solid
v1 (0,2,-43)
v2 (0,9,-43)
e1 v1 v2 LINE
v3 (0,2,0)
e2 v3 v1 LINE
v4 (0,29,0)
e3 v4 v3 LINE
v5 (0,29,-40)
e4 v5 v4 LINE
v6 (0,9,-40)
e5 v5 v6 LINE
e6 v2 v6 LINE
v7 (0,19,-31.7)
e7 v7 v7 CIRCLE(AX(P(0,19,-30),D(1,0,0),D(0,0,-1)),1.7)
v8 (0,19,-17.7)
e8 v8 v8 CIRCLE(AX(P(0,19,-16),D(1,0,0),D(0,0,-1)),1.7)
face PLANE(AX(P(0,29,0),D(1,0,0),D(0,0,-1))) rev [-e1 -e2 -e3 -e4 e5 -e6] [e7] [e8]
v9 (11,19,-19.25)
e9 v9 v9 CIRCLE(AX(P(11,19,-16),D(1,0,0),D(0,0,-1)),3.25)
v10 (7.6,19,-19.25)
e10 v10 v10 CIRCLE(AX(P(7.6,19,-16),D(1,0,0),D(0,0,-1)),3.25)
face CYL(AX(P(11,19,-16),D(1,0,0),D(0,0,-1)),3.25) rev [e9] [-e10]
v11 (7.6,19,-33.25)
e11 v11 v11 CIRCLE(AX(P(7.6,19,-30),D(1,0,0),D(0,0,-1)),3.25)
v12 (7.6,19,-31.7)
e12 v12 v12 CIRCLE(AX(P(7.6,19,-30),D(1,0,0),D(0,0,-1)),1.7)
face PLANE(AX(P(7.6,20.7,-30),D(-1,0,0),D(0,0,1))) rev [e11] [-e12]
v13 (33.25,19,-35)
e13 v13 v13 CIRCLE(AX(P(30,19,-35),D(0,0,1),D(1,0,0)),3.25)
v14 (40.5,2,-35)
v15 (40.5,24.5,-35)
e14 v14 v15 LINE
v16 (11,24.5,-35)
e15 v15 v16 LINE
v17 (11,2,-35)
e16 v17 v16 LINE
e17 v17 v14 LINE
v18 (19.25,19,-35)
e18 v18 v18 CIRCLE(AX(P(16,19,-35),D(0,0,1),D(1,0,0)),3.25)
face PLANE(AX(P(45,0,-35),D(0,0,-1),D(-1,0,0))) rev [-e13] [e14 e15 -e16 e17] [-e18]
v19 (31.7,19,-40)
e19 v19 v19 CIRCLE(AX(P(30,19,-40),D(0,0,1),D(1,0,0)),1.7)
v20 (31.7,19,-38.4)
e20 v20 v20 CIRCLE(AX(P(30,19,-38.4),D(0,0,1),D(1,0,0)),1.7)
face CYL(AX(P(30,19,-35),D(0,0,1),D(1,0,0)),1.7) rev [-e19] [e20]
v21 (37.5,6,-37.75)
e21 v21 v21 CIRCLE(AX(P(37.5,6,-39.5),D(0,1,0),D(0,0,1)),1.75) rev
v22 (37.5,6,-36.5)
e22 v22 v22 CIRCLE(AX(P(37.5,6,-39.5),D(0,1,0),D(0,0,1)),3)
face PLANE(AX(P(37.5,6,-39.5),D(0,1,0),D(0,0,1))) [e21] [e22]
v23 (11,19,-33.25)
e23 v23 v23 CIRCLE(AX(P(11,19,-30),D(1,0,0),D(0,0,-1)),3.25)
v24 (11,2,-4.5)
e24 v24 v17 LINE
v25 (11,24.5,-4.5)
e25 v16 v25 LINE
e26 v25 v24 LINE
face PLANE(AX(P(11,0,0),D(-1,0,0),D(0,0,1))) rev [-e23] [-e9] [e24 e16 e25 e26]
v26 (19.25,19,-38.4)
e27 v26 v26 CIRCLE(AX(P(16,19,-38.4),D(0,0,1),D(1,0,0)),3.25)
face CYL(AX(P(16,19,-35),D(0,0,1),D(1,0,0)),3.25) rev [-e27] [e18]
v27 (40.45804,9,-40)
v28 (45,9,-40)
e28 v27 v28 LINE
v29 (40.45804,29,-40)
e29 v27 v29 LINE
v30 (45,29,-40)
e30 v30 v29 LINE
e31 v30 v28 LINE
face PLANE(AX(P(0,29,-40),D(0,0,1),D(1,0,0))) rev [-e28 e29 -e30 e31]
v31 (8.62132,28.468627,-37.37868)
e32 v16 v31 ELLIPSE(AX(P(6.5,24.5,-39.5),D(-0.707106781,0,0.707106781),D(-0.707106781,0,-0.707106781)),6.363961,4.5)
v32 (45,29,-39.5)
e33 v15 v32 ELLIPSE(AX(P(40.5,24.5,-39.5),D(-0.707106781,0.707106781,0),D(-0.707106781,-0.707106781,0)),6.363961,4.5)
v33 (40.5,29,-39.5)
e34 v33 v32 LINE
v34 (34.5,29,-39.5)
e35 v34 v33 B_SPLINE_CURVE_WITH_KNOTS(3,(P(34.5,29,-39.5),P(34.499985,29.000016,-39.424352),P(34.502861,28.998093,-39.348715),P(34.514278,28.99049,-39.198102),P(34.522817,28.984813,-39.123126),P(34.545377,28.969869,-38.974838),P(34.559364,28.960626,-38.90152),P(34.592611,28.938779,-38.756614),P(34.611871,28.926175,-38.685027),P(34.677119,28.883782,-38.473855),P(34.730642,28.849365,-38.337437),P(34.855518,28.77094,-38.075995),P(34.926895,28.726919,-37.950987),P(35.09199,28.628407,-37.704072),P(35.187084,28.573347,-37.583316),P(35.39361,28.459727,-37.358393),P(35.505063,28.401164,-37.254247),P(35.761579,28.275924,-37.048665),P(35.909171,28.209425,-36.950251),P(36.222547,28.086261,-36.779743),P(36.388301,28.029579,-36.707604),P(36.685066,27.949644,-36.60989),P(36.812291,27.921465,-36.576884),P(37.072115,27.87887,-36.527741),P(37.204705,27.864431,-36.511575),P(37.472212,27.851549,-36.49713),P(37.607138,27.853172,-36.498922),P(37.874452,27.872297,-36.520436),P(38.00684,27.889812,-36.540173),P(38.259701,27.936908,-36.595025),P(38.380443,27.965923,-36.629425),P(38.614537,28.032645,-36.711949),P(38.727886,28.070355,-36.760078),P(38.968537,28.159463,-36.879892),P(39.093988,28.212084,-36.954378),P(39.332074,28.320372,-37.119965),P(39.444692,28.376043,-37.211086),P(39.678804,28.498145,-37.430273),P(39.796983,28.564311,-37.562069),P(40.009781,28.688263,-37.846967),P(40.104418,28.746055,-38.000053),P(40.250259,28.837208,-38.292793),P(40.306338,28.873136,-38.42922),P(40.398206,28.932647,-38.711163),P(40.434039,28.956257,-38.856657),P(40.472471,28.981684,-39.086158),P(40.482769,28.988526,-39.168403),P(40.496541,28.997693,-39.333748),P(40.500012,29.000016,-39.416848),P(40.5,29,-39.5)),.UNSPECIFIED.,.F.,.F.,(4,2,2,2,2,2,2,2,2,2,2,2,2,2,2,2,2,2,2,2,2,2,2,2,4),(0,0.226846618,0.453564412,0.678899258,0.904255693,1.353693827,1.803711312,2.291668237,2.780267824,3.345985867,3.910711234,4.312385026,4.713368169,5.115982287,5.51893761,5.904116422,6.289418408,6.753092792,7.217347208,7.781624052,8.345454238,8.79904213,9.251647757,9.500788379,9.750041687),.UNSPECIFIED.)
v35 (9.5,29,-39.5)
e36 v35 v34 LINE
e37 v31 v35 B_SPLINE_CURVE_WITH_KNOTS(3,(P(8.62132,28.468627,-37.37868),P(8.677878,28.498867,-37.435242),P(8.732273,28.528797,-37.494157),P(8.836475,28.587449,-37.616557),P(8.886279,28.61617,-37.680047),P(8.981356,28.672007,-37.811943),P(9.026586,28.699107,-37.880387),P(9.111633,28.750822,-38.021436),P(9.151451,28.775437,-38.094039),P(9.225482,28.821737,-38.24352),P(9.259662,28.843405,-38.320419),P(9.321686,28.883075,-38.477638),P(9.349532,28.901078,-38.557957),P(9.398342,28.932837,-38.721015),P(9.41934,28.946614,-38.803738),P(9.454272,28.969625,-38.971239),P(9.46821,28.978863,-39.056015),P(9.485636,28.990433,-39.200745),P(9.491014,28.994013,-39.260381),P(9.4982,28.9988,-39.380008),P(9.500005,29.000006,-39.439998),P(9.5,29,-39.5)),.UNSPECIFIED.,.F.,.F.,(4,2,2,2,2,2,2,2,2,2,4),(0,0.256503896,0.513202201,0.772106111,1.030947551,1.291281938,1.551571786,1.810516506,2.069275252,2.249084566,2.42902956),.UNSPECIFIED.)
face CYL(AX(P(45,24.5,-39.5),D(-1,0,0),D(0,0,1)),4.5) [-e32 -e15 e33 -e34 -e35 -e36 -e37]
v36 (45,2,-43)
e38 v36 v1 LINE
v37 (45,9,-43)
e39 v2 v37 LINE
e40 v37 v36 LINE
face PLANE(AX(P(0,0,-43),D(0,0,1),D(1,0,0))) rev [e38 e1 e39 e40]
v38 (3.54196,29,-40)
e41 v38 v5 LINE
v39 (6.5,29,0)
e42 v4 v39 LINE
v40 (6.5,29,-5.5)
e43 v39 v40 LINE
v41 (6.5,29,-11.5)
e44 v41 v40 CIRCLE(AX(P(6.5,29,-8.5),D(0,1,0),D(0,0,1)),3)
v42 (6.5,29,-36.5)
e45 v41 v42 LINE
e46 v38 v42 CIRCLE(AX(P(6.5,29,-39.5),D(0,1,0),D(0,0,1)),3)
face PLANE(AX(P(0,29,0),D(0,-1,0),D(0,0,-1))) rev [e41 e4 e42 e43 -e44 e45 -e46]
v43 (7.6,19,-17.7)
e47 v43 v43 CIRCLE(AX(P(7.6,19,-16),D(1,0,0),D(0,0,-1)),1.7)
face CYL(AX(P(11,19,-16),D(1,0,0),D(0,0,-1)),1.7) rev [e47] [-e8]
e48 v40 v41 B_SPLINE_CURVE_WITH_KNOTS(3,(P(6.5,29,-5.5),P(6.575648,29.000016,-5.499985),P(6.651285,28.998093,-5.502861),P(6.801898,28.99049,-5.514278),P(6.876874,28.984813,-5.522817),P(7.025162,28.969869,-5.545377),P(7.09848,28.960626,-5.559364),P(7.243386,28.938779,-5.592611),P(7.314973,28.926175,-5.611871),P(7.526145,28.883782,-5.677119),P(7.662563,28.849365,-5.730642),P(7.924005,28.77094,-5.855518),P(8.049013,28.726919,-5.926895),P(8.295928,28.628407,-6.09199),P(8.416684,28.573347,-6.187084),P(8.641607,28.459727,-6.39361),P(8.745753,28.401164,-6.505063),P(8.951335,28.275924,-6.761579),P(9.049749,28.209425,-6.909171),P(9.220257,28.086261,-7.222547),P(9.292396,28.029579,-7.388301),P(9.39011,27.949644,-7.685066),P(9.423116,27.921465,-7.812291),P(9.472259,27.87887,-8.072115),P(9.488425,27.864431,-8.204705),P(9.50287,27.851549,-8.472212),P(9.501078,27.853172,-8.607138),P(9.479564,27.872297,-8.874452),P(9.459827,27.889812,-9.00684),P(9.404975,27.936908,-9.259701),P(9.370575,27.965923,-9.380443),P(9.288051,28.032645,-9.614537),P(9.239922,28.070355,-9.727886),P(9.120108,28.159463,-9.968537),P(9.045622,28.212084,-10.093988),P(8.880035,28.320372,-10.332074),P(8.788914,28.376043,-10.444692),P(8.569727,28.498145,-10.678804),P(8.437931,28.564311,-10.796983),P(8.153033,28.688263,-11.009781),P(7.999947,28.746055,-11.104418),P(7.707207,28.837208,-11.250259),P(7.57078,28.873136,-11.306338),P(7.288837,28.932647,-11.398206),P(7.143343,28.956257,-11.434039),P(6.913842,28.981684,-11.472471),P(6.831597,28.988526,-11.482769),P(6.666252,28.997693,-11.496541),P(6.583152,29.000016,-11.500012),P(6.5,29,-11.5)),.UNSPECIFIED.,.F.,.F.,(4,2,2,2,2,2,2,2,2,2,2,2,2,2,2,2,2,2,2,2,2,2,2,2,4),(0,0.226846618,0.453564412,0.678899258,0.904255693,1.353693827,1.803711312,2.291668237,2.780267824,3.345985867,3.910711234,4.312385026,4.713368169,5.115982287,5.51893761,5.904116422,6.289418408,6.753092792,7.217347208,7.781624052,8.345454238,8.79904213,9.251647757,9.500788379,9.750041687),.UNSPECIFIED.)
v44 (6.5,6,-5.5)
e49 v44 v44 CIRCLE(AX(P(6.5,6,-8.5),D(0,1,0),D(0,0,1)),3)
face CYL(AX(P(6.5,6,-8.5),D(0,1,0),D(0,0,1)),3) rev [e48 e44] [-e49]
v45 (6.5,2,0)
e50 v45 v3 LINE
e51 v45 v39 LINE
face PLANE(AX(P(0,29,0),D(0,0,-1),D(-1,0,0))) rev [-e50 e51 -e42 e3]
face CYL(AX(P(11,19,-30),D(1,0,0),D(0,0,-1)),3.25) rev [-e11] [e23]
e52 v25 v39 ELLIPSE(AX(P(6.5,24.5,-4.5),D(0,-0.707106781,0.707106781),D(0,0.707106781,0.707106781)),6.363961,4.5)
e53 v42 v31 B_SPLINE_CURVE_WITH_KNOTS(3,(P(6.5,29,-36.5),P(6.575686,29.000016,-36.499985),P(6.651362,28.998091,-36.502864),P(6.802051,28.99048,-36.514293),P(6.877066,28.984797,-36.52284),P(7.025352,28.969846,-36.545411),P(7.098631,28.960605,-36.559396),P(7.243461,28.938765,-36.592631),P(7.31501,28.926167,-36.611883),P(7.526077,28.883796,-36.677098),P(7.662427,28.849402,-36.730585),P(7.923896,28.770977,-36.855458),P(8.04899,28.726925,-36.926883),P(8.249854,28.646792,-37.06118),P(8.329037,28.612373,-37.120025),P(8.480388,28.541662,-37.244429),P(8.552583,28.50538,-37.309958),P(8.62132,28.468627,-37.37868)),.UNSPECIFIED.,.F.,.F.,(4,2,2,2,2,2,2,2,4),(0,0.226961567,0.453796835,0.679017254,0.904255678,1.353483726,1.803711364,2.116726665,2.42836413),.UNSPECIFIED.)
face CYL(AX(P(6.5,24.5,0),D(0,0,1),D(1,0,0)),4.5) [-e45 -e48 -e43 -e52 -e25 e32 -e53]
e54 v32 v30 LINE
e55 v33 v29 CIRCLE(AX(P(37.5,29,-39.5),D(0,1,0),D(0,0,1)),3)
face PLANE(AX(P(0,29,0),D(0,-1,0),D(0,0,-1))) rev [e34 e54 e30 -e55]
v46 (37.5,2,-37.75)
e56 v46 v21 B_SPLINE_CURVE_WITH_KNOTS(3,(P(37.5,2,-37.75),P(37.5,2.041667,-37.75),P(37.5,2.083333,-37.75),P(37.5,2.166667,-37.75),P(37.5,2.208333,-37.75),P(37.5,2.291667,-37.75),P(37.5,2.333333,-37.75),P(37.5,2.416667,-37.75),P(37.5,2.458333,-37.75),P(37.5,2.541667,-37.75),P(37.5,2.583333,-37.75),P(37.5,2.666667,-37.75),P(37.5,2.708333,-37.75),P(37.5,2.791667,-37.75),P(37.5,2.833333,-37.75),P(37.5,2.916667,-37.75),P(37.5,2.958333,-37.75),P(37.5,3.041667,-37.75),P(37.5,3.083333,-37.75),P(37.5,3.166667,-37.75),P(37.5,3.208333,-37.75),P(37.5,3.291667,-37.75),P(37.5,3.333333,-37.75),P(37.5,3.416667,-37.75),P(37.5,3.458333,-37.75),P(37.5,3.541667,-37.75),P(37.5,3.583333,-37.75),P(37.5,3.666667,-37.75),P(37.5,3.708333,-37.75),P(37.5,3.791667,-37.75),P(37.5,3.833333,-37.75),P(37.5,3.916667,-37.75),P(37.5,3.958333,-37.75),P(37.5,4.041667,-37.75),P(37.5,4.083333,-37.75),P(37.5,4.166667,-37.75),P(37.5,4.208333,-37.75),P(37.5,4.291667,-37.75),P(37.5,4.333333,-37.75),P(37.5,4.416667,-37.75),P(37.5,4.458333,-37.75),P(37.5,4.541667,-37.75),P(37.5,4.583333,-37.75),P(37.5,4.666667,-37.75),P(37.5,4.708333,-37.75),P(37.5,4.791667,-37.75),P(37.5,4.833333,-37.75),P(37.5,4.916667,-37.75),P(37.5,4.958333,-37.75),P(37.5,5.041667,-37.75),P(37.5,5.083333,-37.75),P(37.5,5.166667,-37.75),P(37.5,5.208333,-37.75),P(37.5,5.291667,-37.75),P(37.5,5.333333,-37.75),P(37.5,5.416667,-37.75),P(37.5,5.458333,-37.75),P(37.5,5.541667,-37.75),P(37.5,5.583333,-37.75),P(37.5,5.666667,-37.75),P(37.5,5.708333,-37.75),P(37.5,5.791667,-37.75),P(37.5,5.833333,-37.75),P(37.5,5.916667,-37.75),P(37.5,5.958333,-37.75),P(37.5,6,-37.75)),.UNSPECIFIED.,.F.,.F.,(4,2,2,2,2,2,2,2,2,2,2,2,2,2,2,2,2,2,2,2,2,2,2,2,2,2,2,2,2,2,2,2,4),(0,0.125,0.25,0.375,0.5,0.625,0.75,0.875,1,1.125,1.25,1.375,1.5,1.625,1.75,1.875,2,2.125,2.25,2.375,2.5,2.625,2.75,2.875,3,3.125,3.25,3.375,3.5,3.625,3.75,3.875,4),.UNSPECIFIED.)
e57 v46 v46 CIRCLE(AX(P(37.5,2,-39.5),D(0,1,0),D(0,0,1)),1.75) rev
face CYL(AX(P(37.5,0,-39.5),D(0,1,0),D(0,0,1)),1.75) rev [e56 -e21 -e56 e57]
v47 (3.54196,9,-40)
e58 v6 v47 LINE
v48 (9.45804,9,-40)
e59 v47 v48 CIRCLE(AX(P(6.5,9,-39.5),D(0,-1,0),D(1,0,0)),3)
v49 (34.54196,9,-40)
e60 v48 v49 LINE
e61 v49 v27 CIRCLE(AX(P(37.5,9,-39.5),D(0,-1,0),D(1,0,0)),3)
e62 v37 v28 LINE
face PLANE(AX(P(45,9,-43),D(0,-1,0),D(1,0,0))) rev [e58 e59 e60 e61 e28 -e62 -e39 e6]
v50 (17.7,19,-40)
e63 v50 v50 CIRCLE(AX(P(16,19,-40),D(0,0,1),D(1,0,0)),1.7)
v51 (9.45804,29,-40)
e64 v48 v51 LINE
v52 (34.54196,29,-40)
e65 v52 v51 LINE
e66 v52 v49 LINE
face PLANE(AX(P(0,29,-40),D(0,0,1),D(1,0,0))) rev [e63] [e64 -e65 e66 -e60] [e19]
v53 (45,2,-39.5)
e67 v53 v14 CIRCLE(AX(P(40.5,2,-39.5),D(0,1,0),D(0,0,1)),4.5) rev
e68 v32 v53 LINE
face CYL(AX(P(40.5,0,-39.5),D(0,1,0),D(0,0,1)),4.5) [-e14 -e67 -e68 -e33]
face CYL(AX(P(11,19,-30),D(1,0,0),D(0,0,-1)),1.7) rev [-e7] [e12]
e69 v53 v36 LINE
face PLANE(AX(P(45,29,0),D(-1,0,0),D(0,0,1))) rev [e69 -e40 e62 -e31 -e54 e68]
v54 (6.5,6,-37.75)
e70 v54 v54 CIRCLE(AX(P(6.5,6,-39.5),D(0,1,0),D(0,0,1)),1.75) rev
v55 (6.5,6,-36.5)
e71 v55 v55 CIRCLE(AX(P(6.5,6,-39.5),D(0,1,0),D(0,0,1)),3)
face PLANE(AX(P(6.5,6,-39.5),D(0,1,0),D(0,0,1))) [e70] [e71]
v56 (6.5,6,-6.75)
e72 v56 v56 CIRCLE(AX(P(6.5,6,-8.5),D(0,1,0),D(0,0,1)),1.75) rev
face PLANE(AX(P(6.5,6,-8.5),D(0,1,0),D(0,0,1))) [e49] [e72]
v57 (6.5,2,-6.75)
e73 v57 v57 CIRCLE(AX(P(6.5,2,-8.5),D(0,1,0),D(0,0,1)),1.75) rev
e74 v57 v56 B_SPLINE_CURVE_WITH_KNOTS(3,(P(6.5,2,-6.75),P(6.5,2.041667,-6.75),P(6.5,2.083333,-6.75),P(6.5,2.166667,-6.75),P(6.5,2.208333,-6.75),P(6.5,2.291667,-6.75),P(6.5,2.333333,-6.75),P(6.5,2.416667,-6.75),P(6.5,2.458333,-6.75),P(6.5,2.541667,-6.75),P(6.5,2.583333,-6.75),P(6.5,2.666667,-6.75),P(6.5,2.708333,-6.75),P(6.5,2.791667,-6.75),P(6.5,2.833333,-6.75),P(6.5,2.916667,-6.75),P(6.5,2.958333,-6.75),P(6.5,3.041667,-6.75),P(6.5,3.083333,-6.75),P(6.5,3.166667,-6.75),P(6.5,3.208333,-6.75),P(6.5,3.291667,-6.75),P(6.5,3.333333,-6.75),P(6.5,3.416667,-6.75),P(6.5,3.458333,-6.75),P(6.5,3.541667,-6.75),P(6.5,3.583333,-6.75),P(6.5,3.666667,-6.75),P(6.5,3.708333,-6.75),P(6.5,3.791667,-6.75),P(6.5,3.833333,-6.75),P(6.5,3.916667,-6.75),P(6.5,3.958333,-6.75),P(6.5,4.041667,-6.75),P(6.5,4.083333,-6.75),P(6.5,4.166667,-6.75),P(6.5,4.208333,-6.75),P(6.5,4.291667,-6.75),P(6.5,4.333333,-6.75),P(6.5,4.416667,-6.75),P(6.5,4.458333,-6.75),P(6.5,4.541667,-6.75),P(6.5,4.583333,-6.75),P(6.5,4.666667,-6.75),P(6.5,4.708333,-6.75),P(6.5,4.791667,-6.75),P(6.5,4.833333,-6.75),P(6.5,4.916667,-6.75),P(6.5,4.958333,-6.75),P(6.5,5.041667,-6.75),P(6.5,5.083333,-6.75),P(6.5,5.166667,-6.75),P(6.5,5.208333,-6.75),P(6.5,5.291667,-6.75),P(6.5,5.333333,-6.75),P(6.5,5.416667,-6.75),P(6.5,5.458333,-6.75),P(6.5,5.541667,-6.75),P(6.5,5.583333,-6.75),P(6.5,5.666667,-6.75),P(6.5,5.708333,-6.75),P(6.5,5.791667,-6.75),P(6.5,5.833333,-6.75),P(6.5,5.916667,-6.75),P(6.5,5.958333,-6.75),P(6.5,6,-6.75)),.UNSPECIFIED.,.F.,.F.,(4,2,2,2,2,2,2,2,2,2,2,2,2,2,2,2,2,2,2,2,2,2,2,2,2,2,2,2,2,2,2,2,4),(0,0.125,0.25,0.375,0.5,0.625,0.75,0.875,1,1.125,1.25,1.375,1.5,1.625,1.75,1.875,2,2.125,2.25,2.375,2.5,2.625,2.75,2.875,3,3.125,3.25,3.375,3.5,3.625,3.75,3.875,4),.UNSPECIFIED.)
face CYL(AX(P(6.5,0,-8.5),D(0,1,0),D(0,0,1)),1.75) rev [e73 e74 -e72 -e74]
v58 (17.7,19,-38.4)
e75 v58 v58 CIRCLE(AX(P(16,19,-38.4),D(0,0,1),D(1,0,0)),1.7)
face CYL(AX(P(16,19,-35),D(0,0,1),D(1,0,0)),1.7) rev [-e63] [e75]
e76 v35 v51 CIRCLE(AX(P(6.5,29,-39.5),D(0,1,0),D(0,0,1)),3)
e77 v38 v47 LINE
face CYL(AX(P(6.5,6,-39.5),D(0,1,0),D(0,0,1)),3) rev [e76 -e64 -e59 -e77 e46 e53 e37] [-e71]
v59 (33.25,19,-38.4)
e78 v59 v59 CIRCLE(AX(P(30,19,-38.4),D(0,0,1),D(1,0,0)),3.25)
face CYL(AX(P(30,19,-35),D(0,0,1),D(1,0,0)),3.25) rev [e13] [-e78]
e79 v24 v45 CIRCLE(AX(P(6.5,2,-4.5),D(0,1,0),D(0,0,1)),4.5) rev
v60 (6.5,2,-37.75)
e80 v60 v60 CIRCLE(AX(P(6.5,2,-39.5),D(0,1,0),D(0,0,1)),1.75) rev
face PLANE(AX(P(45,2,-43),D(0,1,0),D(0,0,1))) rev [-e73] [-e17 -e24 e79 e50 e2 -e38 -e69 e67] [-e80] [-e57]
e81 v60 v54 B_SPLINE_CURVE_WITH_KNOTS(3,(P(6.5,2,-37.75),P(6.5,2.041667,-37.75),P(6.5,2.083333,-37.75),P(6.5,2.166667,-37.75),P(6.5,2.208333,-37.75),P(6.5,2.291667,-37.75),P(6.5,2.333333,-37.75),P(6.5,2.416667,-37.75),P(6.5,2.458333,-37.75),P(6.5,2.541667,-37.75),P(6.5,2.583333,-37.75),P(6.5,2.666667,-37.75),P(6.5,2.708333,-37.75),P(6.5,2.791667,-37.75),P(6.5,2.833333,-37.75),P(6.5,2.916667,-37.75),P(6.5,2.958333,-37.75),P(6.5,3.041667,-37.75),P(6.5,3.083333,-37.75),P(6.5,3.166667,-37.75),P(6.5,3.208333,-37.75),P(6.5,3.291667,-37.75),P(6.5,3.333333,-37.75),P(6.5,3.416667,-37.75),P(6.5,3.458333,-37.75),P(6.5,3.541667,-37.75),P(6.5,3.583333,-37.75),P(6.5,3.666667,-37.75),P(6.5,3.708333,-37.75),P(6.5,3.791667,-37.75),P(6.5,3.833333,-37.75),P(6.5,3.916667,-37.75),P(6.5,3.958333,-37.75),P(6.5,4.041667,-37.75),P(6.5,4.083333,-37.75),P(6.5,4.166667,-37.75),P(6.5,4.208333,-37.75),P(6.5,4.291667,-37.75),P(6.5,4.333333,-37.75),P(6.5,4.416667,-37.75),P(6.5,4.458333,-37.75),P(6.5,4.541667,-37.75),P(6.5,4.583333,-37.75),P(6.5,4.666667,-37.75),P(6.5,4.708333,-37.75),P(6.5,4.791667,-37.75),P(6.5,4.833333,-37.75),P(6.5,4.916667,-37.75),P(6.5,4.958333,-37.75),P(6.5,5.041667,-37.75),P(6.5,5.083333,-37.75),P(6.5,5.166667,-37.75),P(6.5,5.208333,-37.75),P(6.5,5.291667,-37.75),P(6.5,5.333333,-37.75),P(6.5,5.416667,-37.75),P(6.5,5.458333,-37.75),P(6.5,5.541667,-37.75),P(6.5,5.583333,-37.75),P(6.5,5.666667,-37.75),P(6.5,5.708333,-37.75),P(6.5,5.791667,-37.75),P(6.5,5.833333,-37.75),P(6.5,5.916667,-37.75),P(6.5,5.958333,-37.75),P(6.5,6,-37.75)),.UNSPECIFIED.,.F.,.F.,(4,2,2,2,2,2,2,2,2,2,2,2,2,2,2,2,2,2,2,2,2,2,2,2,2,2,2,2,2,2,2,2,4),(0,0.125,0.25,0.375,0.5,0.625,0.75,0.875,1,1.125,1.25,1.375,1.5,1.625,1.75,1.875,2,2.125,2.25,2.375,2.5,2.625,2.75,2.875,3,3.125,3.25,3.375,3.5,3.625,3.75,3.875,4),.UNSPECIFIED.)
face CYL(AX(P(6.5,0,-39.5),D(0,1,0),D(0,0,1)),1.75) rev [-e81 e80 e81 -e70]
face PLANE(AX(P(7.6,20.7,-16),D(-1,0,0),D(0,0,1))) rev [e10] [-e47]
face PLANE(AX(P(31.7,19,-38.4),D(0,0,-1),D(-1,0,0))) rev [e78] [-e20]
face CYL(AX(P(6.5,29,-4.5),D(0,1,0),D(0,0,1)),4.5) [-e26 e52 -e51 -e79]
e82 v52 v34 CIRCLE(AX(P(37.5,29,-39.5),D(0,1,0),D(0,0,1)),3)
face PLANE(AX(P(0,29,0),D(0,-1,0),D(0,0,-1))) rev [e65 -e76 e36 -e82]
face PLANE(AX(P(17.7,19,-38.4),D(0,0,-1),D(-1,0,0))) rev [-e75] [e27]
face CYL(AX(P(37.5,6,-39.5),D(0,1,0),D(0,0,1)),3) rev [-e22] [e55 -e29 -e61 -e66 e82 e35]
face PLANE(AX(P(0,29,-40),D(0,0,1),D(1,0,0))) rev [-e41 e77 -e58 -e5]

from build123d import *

# Parameters (mm, degrees)
SKETCH1_W                                           = 45
SKETCH1_H                                           = 40
BOSS_EXTRUDE1_DEPTH                                 = 29
SKETCH33_W                                          = 34
SKETCH33_H                                          = 35
CUT_EXTRUDE7_DEPTH                                  = 67.828137786
SKETCH39_W                                          = 45
SKETCH39_H                                          = 9
BOSS_EXTRUDE2_DEPTH                                 = 3
CUT_EXTRUDE6_DEPTH                                  = 69.6658576
CUT_EXTRUDE6_DEPTH_BACK                             = 69.6658576
SKETCH21_R                                          = 1.75
SKETCH34_R                                          = 3
CUT_EXTRUDE8_DEPTH                                  = 23
CBORE_FOR_M3_HEX_SOCKET_HEAD_CAP_SCREW1_D           = 3.4
CBORE_FOR_M3_HEX_SOCKET_HEAD_CAP_SCREW1_CBORE_D     = 6.5
CBORE_FOR_M3_HEX_SOCKET_HEAD_CAP_SCREW1_CBORE_DEPTH = 3.4
CBORE_FOR_M3_HEX_SOCKET_HEAD_CAP_SCREW2_D           = 3.4
CBORE_FOR_M3_HEX_SOCKET_HEAD_CAP_SCREW2_CBORE_D     = 6.5
CBORE_FOR_M3_HEX_SOCKET_HEAD_CAP_SCREW2_CBORE_DEPTH = 3.4
FILLET1_R                                           = 4.5
SKETCH40_W                                          = 43
SKETCH40_H                                          = 2
CUT_EXTRUDE9_DEPTH                                  = 69.665857708


with BuildPart() as part:
    # Sketch1 → Boss-Extrude1 (new body)
    with BuildSketch(Plane(origin=(0, 0, 0), x_dir=(1, 0, 0), z_dir=(0, 1, 0))):
        with Locations((22.5, 20)):
            Rectangle(SKETCH1_W, SKETCH1_H)
    extrude(amount=BOSS_EXTRUDE1_DEPTH)

    # Sketch33 → Cut-Extrude7 (cut, through all)
    with BuildSketch(Plane(origin=(0, 29, 0), x_dir=(1, 0, 0), z_dir=(0, 1, 0))):
        with Locations((28, 17.5)):
            Rectangle(SKETCH33_W, SKETCH33_H)
    extrude(amount=-CUT_EXTRUDE7_DEPTH, mode=Mode.SUBTRACT)

    # Sketch39 → Boss-Extrude2 (add)
    with BuildSketch(Plane(origin=(0, 0, -40), x_dir=(-1, 0, 0), z_dir=(0, 0, -1))):
        with Locations((-22.5, 4.5)):
            Rectangle(SKETCH39_W, SKETCH39_H)
    extrude(amount=BOSS_EXTRUDE2_DEPTH)

    # Sketch21 → Cut-Extrude6 (cut, two sides: drawn at the far end of the back side and taken through both)
    with BuildSketch(Plane(origin=(0, 29, 0), x_dir=(1, 0, 0), z_dir=(0, 1, 0)).offset(-CUT_EXTRUDE6_DEPTH_BACK)):
        with Locations(Location((6.5, 39.5, 0), (0, 0, 270))):
            Circle(SKETCH21_R)
        with Locations(Location((6.5, 8.5, 0), (0, 0, 270))):
            Circle(SKETCH21_R)
        with Locations(Location((37.5, 39.5, 0), (0, 0, 270))):
            Circle(SKETCH21_R)
    extrude(amount=CUT_EXTRUDE6_DEPTH + CUT_EXTRUDE6_DEPTH_BACK, mode=Mode.SUBTRACT)

    # Sketch34 → Cut-Extrude8 (cut)
    with BuildSketch(Plane(origin=(0, 29, 0), x_dir=(1, 0, 0), z_dir=(0, 1, 0))):
        with Locations(Location((6.5, 8.5, 0), (0, 0, 270))):
            Circle(SKETCH34_R)
        with Locations(Location((6.5, 39.5, 0), (0, 0, 270))):
            Circle(SKETCH34_R)
        with Locations(Location((37.5, 39.5, 0), (0, 0, 270))):
            Circle(SKETCH34_R)
    extrude(amount=-CUT_EXTRUDE8_DEPTH, mode=Mode.SUBTRACT)

    # CBORE for M3 Hex Socket Head Cap Screw1 (through all)
    with Locations(Plane(origin=(11, 0, 0), x_dir=(0, 0, -1), z_dir=(1, 0, 0))):
        with Locations((16, 19), (30, 19)):
            CounterBoreHole(CBORE_FOR_M3_HEX_SOCKET_HEAD_CAP_SCREW1_D / 2, CBORE_FOR_M3_HEX_SOCKET_HEAD_CAP_SCREW1_CBORE_D / 2, CBORE_FOR_M3_HEX_SOCKET_HEAD_CAP_SCREW1_CBORE_DEPTH)

    # CBORE for M3 Hex Socket Head Cap Screw2 (through all)
    with Locations(Plane.XY.offset(-35)):
        with Locations((16, 19), (30, 19)):
            CounterBoreHole(CBORE_FOR_M3_HEX_SOCKET_HEAD_CAP_SCREW2_D / 2, CBORE_FOR_M3_HEX_SOCKET_HEAD_CAP_SCREW2_CBORE_D / 2, CBORE_FOR_M3_HEX_SOCKET_HEAD_CAP_SCREW2_CBORE_DEPTH)

    # Fillet1
    # the kernel refuses this fillet: 4.5 mm, written as the material it takes off along each edge
    with BuildSketch(Plane(origin=(45, 29, -35), x_dir=(0, 0, -1), z_dir=(0, -1, 0))) as fillet1_piece_1:
        with BuildLine():
            CenterArc((FILLET1_R, -FILLET1_R), FILLET1_R, 90, 90)
            Line((0, -FILLET1_R), (-FILLET1_R * 0.02, -FILLET1_R))
            Line((-FILLET1_R * 0.02, -FILLET1_R), (-FILLET1_R * 0.02, FILLET1_R * 0.02))
            Line((-FILLET1_R * 0.02, FILLET1_R * 0.02), (FILLET1_R, FILLET1_R * 0.02))
            Line((FILLET1_R, FILLET1_R * 0.02), (FILLET1_R, 0))
        make_face()
    extrude(amount=29, mode=Mode.SUBTRACT)
    with BuildSketch(Plane(origin=(11, 29, 0), x_dir=(-1, 0, 0), z_dir=(0, -1, 0))) as fillet1_piece_2:
        with BuildLine():
            CenterArc((FILLET1_R, FILLET1_R), FILLET1_R, 180, 90)
            Line((0, FILLET1_R), (-FILLET1_R * 0.02, FILLET1_R))
            Line((-FILLET1_R * 0.02, FILLET1_R), (-FILLET1_R * 0.02, -FILLET1_R * 0.02))
            Line((-FILLET1_R * 0.02, -FILLET1_R * 0.02), (FILLET1_R, -FILLET1_R * 0.02))
            Line((FILLET1_R, -FILLET1_R * 0.02), (FILLET1_R, 0))
        make_face()
    extrude(amount=29, mode=Mode.SUBTRACT)
    with BuildSketch(Plane(origin=(11, 29, -35), x_dir=(0, 0, -1), z_dir=(1, 0, 0))) as fillet1_piece_3:
        with BuildLine():
            CenterArc((FILLET1_R, -FILLET1_R), FILLET1_R, 90, 90)
            Line((0, -FILLET1_R), (-FILLET1_R * 0.02, -FILLET1_R))
            Line((-FILLET1_R * 0.02, -FILLET1_R), (-FILLET1_R * 0.02, FILLET1_R * 0.02))
            Line((-FILLET1_R * 0.02, FILLET1_R * 0.02), (FILLET1_R, FILLET1_R * 0.02))
            Line((FILLET1_R, FILLET1_R * 0.02), (FILLET1_R, 0))
        make_face()
    extrude(amount=34, mode=Mode.SUBTRACT)
    with BuildSketch(Plane(origin=(11, 29, 0), x_dir=(0, -1, 0), z_dir=(0, 0, -1))) as fillet1_piece_4:
        with BuildLine():
            CenterArc((FILLET1_R, FILLET1_R), FILLET1_R, 180, 90)
            Line((0, FILLET1_R), (-FILLET1_R * 0.02, FILLET1_R))
            Line((-FILLET1_R * 0.02, FILLET1_R), (-FILLET1_R * 0.02, -FILLET1_R * 0.02))
            Line((-FILLET1_R * 0.02, -FILLET1_R * 0.02), (FILLET1_R, -FILLET1_R * 0.02))
            Line((FILLET1_R, -FILLET1_R * 0.02), (FILLET1_R, 0))
        make_face()
    extrude(amount=35, mode=Mode.SUBTRACT)
    with BuildSketch(Plane(origin=(11, 29, -35), x_dir=(0, 0, -1), z_dir=(1, 0, 0))) as fillet1_piece_5a_section:
        with BuildLine():
            CenterArc((FILLET1_R, -FILLET1_R), FILLET1_R, 90, 90)
            Line((0, -FILLET1_R), (-FILLET1_R * 0.02, -FILLET1_R))
            Line((-FILLET1_R * 0.02, -FILLET1_R), (-FILLET1_R * 0.02, FILLET1_R * 0.02))
            Line((-FILLET1_R * 0.02, FILLET1_R * 0.02), (FILLET1_R, FILLET1_R * 0.02))
            Line((FILLET1_R, FILLET1_R * 0.02), (FILLET1_R, 0))
        make_face()
    fillet1_piece_5a = extrude(amount=45.25, mode=Mode.PRIVATE)
    fillet1_piece_5a = split(fillet1_piece_5a, bisect_by=Plane(origin=(45, 27.981221986, -36.018778014), z_dir=(1, 0, 0)), keep=Keep.TOP, mode=Mode.PRIVATE)
    with BuildSketch(Plane(origin=(45, 40.25, -35), x_dir=(0, 0, -1), z_dir=(0, -1, 0))) as fillet1_piece_5b_section:
        with BuildLine():
            CenterArc((FILLET1_R, -FILLET1_R), FILLET1_R, 90, 90)
            Line((0, -FILLET1_R), (-FILLET1_R * 0.02, -FILLET1_R))
            Line((-FILLET1_R * 0.02, -FILLET1_R), (-FILLET1_R * 0.02, FILLET1_R * 0.02))
            Line((-FILLET1_R * 0.02, FILLET1_R * 0.02), (FILLET1_R, FILLET1_R * 0.02))
            Line((FILLET1_R, FILLET1_R * 0.02), (FILLET1_R, 0))
        make_face()
    fillet1_piece_5b = extrude(amount=40.25, mode=Mode.PRIVATE)
    fillet1_piece_5b = split(fillet1_piece_5b, bisect_by=Plane(origin=(43.981221986, 29, -36.018778014), z_dir=(0, 1, 0)), keep=Keep.TOP, mode=Mode.PRIVATE)
    fillet1_piece_5 = fillet1_piece_5a & fillet1_piece_5b
    add(fillet1_piece_5, mode=Mode.SUBTRACT)
    with BuildSketch(Plane(origin=(11, 40.25, 0), x_dir=(-1, 0, 0), z_dir=(0, -1, 0))) as fillet1_piece_6a_section:
        with BuildLine():
            CenterArc((FILLET1_R, FILLET1_R), FILLET1_R, 180, 90)
            Line((0, FILLET1_R), (-FILLET1_R * 0.02, FILLET1_R))
            Line((-FILLET1_R * 0.02, FILLET1_R), (-FILLET1_R * 0.02, -FILLET1_R * 0.02))
            Line((-FILLET1_R * 0.02, -FILLET1_R * 0.02), (FILLET1_R, -FILLET1_R * 0.02))
            Line((FILLET1_R, -FILLET1_R * 0.02), (FILLET1_R, 0))
        make_face()
    fillet1_piece_6a = extrude(amount=40.25, mode=Mode.PRIVATE)
    fillet1_piece_6a = split(fillet1_piece_6a, bisect_by=Plane(origin=(9.981221986, 29, -1.018778014), z_dir=(0, 1, 0)), keep=Keep.TOP, mode=Mode.PRIVATE)
    with BuildSketch(Plane(origin=(11, 29, 11.25), x_dir=(0, -1, 0), z_dir=(0, 0, -1))) as fillet1_piece_6b_section:
        with BuildLine():
            CenterArc((FILLET1_R, FILLET1_R), FILLET1_R, 180, 90)
            Line((0, FILLET1_R), (-FILLET1_R * 0.02, FILLET1_R))
            Line((-FILLET1_R * 0.02, FILLET1_R), (-FILLET1_R * 0.02, -FILLET1_R * 0.02))
            Line((-FILLET1_R * 0.02, -FILLET1_R * 0.02), (FILLET1_R, -FILLET1_R * 0.02))
            Line((FILLET1_R, -FILLET1_R * 0.02), (FILLET1_R, 0))
        make_face()
    fillet1_piece_6b = extrude(amount=46.25, mode=Mode.PRIVATE)
    fillet1_piece_6b = split(fillet1_piece_6b, bisect_by=Plane(origin=(9.981221986, 27.981221986, 0), z_dir=(0, 0, 1)), keep=Keep.TOP, mode=Mode.PRIVATE)
    fillet1_piece_6 = fillet1_piece_6a & fillet1_piece_6b
    add(fillet1_piece_6, mode=Mode.SUBTRACT)
    with BuildSketch(Plane(origin=(11, 29, 0), x_dir=(0, -1, 0), z_dir=(0, 0, -1))) as fillet1_piece_7a_section:
        with BuildLine():
            CenterArc((FILLET1_R, FILLET1_R), FILLET1_R, 180, 90)
            Line((0, FILLET1_R), (-FILLET1_R * 0.02, FILLET1_R))
            Line((-FILLET1_R * 0.02, FILLET1_R), (-FILLET1_R * 0.02, -FILLET1_R * 0.02))
            Line((-FILLET1_R * 0.02, -FILLET1_R * 0.02), (FILLET1_R, -FILLET1_R * 0.02))
            Line((FILLET1_R, -FILLET1_R * 0.02), (FILLET1_R, 0))
        make_face()
    fillet1_piece_7a = extrude(amount=46.25, mode=Mode.PRIVATE)
    fillet1_piece_7a = split(fillet1_piece_7a, bisect_by=Plane(origin=(9.981221986, 27.981221986, -35), z_dir=(0, 0, -1)), keep=Keep.TOP, mode=Mode.PRIVATE)
    with BuildSketch(Plane(origin=(-0.25, 29, -35), x_dir=(0, 0, -1), z_dir=(1, 0, 0))) as fillet1_piece_7b_section:
        with BuildLine():
            CenterArc((FILLET1_R, -FILLET1_R), FILLET1_R, 90, 90)
            Line((0, -FILLET1_R), (-FILLET1_R * 0.02, -FILLET1_R))
            Line((-FILLET1_R * 0.02, -FILLET1_R), (-FILLET1_R * 0.02, FILLET1_R * 0.02))
            Line((-FILLET1_R * 0.02, FILLET1_R * 0.02), (FILLET1_R, FILLET1_R * 0.02))
            Line((FILLET1_R, FILLET1_R * 0.02), (FILLET1_R, 0))
        make_face()
    fillet1_piece_7b = extrude(amount=45.25, mode=Mode.PRIVATE)
    fillet1_piece_7b = split(fillet1_piece_7b, bisect_by=Plane(origin=(11, 27.981221986, -36.018778014), z_dir=(-1, 0, 0)), keep=Keep.TOP, mode=Mode.PRIVATE)
    fillet1_piece_7 = fillet1_piece_7a & fillet1_piece_7b
    add(fillet1_piece_7, mode=Mode.SUBTRACT)

    # Sketch40 → Cut-Extrude9 (cut, through all)
    with BuildSketch(Plane.ZY):
        with Locations((-21.5, 1)):
            Rectangle(SKETCH40_W, SKETCH40_H)
    extrude(amount=-CUT_EXTRUDE9_DEPTH, mode=Mode.SUBTRACT)


solid = part.part
